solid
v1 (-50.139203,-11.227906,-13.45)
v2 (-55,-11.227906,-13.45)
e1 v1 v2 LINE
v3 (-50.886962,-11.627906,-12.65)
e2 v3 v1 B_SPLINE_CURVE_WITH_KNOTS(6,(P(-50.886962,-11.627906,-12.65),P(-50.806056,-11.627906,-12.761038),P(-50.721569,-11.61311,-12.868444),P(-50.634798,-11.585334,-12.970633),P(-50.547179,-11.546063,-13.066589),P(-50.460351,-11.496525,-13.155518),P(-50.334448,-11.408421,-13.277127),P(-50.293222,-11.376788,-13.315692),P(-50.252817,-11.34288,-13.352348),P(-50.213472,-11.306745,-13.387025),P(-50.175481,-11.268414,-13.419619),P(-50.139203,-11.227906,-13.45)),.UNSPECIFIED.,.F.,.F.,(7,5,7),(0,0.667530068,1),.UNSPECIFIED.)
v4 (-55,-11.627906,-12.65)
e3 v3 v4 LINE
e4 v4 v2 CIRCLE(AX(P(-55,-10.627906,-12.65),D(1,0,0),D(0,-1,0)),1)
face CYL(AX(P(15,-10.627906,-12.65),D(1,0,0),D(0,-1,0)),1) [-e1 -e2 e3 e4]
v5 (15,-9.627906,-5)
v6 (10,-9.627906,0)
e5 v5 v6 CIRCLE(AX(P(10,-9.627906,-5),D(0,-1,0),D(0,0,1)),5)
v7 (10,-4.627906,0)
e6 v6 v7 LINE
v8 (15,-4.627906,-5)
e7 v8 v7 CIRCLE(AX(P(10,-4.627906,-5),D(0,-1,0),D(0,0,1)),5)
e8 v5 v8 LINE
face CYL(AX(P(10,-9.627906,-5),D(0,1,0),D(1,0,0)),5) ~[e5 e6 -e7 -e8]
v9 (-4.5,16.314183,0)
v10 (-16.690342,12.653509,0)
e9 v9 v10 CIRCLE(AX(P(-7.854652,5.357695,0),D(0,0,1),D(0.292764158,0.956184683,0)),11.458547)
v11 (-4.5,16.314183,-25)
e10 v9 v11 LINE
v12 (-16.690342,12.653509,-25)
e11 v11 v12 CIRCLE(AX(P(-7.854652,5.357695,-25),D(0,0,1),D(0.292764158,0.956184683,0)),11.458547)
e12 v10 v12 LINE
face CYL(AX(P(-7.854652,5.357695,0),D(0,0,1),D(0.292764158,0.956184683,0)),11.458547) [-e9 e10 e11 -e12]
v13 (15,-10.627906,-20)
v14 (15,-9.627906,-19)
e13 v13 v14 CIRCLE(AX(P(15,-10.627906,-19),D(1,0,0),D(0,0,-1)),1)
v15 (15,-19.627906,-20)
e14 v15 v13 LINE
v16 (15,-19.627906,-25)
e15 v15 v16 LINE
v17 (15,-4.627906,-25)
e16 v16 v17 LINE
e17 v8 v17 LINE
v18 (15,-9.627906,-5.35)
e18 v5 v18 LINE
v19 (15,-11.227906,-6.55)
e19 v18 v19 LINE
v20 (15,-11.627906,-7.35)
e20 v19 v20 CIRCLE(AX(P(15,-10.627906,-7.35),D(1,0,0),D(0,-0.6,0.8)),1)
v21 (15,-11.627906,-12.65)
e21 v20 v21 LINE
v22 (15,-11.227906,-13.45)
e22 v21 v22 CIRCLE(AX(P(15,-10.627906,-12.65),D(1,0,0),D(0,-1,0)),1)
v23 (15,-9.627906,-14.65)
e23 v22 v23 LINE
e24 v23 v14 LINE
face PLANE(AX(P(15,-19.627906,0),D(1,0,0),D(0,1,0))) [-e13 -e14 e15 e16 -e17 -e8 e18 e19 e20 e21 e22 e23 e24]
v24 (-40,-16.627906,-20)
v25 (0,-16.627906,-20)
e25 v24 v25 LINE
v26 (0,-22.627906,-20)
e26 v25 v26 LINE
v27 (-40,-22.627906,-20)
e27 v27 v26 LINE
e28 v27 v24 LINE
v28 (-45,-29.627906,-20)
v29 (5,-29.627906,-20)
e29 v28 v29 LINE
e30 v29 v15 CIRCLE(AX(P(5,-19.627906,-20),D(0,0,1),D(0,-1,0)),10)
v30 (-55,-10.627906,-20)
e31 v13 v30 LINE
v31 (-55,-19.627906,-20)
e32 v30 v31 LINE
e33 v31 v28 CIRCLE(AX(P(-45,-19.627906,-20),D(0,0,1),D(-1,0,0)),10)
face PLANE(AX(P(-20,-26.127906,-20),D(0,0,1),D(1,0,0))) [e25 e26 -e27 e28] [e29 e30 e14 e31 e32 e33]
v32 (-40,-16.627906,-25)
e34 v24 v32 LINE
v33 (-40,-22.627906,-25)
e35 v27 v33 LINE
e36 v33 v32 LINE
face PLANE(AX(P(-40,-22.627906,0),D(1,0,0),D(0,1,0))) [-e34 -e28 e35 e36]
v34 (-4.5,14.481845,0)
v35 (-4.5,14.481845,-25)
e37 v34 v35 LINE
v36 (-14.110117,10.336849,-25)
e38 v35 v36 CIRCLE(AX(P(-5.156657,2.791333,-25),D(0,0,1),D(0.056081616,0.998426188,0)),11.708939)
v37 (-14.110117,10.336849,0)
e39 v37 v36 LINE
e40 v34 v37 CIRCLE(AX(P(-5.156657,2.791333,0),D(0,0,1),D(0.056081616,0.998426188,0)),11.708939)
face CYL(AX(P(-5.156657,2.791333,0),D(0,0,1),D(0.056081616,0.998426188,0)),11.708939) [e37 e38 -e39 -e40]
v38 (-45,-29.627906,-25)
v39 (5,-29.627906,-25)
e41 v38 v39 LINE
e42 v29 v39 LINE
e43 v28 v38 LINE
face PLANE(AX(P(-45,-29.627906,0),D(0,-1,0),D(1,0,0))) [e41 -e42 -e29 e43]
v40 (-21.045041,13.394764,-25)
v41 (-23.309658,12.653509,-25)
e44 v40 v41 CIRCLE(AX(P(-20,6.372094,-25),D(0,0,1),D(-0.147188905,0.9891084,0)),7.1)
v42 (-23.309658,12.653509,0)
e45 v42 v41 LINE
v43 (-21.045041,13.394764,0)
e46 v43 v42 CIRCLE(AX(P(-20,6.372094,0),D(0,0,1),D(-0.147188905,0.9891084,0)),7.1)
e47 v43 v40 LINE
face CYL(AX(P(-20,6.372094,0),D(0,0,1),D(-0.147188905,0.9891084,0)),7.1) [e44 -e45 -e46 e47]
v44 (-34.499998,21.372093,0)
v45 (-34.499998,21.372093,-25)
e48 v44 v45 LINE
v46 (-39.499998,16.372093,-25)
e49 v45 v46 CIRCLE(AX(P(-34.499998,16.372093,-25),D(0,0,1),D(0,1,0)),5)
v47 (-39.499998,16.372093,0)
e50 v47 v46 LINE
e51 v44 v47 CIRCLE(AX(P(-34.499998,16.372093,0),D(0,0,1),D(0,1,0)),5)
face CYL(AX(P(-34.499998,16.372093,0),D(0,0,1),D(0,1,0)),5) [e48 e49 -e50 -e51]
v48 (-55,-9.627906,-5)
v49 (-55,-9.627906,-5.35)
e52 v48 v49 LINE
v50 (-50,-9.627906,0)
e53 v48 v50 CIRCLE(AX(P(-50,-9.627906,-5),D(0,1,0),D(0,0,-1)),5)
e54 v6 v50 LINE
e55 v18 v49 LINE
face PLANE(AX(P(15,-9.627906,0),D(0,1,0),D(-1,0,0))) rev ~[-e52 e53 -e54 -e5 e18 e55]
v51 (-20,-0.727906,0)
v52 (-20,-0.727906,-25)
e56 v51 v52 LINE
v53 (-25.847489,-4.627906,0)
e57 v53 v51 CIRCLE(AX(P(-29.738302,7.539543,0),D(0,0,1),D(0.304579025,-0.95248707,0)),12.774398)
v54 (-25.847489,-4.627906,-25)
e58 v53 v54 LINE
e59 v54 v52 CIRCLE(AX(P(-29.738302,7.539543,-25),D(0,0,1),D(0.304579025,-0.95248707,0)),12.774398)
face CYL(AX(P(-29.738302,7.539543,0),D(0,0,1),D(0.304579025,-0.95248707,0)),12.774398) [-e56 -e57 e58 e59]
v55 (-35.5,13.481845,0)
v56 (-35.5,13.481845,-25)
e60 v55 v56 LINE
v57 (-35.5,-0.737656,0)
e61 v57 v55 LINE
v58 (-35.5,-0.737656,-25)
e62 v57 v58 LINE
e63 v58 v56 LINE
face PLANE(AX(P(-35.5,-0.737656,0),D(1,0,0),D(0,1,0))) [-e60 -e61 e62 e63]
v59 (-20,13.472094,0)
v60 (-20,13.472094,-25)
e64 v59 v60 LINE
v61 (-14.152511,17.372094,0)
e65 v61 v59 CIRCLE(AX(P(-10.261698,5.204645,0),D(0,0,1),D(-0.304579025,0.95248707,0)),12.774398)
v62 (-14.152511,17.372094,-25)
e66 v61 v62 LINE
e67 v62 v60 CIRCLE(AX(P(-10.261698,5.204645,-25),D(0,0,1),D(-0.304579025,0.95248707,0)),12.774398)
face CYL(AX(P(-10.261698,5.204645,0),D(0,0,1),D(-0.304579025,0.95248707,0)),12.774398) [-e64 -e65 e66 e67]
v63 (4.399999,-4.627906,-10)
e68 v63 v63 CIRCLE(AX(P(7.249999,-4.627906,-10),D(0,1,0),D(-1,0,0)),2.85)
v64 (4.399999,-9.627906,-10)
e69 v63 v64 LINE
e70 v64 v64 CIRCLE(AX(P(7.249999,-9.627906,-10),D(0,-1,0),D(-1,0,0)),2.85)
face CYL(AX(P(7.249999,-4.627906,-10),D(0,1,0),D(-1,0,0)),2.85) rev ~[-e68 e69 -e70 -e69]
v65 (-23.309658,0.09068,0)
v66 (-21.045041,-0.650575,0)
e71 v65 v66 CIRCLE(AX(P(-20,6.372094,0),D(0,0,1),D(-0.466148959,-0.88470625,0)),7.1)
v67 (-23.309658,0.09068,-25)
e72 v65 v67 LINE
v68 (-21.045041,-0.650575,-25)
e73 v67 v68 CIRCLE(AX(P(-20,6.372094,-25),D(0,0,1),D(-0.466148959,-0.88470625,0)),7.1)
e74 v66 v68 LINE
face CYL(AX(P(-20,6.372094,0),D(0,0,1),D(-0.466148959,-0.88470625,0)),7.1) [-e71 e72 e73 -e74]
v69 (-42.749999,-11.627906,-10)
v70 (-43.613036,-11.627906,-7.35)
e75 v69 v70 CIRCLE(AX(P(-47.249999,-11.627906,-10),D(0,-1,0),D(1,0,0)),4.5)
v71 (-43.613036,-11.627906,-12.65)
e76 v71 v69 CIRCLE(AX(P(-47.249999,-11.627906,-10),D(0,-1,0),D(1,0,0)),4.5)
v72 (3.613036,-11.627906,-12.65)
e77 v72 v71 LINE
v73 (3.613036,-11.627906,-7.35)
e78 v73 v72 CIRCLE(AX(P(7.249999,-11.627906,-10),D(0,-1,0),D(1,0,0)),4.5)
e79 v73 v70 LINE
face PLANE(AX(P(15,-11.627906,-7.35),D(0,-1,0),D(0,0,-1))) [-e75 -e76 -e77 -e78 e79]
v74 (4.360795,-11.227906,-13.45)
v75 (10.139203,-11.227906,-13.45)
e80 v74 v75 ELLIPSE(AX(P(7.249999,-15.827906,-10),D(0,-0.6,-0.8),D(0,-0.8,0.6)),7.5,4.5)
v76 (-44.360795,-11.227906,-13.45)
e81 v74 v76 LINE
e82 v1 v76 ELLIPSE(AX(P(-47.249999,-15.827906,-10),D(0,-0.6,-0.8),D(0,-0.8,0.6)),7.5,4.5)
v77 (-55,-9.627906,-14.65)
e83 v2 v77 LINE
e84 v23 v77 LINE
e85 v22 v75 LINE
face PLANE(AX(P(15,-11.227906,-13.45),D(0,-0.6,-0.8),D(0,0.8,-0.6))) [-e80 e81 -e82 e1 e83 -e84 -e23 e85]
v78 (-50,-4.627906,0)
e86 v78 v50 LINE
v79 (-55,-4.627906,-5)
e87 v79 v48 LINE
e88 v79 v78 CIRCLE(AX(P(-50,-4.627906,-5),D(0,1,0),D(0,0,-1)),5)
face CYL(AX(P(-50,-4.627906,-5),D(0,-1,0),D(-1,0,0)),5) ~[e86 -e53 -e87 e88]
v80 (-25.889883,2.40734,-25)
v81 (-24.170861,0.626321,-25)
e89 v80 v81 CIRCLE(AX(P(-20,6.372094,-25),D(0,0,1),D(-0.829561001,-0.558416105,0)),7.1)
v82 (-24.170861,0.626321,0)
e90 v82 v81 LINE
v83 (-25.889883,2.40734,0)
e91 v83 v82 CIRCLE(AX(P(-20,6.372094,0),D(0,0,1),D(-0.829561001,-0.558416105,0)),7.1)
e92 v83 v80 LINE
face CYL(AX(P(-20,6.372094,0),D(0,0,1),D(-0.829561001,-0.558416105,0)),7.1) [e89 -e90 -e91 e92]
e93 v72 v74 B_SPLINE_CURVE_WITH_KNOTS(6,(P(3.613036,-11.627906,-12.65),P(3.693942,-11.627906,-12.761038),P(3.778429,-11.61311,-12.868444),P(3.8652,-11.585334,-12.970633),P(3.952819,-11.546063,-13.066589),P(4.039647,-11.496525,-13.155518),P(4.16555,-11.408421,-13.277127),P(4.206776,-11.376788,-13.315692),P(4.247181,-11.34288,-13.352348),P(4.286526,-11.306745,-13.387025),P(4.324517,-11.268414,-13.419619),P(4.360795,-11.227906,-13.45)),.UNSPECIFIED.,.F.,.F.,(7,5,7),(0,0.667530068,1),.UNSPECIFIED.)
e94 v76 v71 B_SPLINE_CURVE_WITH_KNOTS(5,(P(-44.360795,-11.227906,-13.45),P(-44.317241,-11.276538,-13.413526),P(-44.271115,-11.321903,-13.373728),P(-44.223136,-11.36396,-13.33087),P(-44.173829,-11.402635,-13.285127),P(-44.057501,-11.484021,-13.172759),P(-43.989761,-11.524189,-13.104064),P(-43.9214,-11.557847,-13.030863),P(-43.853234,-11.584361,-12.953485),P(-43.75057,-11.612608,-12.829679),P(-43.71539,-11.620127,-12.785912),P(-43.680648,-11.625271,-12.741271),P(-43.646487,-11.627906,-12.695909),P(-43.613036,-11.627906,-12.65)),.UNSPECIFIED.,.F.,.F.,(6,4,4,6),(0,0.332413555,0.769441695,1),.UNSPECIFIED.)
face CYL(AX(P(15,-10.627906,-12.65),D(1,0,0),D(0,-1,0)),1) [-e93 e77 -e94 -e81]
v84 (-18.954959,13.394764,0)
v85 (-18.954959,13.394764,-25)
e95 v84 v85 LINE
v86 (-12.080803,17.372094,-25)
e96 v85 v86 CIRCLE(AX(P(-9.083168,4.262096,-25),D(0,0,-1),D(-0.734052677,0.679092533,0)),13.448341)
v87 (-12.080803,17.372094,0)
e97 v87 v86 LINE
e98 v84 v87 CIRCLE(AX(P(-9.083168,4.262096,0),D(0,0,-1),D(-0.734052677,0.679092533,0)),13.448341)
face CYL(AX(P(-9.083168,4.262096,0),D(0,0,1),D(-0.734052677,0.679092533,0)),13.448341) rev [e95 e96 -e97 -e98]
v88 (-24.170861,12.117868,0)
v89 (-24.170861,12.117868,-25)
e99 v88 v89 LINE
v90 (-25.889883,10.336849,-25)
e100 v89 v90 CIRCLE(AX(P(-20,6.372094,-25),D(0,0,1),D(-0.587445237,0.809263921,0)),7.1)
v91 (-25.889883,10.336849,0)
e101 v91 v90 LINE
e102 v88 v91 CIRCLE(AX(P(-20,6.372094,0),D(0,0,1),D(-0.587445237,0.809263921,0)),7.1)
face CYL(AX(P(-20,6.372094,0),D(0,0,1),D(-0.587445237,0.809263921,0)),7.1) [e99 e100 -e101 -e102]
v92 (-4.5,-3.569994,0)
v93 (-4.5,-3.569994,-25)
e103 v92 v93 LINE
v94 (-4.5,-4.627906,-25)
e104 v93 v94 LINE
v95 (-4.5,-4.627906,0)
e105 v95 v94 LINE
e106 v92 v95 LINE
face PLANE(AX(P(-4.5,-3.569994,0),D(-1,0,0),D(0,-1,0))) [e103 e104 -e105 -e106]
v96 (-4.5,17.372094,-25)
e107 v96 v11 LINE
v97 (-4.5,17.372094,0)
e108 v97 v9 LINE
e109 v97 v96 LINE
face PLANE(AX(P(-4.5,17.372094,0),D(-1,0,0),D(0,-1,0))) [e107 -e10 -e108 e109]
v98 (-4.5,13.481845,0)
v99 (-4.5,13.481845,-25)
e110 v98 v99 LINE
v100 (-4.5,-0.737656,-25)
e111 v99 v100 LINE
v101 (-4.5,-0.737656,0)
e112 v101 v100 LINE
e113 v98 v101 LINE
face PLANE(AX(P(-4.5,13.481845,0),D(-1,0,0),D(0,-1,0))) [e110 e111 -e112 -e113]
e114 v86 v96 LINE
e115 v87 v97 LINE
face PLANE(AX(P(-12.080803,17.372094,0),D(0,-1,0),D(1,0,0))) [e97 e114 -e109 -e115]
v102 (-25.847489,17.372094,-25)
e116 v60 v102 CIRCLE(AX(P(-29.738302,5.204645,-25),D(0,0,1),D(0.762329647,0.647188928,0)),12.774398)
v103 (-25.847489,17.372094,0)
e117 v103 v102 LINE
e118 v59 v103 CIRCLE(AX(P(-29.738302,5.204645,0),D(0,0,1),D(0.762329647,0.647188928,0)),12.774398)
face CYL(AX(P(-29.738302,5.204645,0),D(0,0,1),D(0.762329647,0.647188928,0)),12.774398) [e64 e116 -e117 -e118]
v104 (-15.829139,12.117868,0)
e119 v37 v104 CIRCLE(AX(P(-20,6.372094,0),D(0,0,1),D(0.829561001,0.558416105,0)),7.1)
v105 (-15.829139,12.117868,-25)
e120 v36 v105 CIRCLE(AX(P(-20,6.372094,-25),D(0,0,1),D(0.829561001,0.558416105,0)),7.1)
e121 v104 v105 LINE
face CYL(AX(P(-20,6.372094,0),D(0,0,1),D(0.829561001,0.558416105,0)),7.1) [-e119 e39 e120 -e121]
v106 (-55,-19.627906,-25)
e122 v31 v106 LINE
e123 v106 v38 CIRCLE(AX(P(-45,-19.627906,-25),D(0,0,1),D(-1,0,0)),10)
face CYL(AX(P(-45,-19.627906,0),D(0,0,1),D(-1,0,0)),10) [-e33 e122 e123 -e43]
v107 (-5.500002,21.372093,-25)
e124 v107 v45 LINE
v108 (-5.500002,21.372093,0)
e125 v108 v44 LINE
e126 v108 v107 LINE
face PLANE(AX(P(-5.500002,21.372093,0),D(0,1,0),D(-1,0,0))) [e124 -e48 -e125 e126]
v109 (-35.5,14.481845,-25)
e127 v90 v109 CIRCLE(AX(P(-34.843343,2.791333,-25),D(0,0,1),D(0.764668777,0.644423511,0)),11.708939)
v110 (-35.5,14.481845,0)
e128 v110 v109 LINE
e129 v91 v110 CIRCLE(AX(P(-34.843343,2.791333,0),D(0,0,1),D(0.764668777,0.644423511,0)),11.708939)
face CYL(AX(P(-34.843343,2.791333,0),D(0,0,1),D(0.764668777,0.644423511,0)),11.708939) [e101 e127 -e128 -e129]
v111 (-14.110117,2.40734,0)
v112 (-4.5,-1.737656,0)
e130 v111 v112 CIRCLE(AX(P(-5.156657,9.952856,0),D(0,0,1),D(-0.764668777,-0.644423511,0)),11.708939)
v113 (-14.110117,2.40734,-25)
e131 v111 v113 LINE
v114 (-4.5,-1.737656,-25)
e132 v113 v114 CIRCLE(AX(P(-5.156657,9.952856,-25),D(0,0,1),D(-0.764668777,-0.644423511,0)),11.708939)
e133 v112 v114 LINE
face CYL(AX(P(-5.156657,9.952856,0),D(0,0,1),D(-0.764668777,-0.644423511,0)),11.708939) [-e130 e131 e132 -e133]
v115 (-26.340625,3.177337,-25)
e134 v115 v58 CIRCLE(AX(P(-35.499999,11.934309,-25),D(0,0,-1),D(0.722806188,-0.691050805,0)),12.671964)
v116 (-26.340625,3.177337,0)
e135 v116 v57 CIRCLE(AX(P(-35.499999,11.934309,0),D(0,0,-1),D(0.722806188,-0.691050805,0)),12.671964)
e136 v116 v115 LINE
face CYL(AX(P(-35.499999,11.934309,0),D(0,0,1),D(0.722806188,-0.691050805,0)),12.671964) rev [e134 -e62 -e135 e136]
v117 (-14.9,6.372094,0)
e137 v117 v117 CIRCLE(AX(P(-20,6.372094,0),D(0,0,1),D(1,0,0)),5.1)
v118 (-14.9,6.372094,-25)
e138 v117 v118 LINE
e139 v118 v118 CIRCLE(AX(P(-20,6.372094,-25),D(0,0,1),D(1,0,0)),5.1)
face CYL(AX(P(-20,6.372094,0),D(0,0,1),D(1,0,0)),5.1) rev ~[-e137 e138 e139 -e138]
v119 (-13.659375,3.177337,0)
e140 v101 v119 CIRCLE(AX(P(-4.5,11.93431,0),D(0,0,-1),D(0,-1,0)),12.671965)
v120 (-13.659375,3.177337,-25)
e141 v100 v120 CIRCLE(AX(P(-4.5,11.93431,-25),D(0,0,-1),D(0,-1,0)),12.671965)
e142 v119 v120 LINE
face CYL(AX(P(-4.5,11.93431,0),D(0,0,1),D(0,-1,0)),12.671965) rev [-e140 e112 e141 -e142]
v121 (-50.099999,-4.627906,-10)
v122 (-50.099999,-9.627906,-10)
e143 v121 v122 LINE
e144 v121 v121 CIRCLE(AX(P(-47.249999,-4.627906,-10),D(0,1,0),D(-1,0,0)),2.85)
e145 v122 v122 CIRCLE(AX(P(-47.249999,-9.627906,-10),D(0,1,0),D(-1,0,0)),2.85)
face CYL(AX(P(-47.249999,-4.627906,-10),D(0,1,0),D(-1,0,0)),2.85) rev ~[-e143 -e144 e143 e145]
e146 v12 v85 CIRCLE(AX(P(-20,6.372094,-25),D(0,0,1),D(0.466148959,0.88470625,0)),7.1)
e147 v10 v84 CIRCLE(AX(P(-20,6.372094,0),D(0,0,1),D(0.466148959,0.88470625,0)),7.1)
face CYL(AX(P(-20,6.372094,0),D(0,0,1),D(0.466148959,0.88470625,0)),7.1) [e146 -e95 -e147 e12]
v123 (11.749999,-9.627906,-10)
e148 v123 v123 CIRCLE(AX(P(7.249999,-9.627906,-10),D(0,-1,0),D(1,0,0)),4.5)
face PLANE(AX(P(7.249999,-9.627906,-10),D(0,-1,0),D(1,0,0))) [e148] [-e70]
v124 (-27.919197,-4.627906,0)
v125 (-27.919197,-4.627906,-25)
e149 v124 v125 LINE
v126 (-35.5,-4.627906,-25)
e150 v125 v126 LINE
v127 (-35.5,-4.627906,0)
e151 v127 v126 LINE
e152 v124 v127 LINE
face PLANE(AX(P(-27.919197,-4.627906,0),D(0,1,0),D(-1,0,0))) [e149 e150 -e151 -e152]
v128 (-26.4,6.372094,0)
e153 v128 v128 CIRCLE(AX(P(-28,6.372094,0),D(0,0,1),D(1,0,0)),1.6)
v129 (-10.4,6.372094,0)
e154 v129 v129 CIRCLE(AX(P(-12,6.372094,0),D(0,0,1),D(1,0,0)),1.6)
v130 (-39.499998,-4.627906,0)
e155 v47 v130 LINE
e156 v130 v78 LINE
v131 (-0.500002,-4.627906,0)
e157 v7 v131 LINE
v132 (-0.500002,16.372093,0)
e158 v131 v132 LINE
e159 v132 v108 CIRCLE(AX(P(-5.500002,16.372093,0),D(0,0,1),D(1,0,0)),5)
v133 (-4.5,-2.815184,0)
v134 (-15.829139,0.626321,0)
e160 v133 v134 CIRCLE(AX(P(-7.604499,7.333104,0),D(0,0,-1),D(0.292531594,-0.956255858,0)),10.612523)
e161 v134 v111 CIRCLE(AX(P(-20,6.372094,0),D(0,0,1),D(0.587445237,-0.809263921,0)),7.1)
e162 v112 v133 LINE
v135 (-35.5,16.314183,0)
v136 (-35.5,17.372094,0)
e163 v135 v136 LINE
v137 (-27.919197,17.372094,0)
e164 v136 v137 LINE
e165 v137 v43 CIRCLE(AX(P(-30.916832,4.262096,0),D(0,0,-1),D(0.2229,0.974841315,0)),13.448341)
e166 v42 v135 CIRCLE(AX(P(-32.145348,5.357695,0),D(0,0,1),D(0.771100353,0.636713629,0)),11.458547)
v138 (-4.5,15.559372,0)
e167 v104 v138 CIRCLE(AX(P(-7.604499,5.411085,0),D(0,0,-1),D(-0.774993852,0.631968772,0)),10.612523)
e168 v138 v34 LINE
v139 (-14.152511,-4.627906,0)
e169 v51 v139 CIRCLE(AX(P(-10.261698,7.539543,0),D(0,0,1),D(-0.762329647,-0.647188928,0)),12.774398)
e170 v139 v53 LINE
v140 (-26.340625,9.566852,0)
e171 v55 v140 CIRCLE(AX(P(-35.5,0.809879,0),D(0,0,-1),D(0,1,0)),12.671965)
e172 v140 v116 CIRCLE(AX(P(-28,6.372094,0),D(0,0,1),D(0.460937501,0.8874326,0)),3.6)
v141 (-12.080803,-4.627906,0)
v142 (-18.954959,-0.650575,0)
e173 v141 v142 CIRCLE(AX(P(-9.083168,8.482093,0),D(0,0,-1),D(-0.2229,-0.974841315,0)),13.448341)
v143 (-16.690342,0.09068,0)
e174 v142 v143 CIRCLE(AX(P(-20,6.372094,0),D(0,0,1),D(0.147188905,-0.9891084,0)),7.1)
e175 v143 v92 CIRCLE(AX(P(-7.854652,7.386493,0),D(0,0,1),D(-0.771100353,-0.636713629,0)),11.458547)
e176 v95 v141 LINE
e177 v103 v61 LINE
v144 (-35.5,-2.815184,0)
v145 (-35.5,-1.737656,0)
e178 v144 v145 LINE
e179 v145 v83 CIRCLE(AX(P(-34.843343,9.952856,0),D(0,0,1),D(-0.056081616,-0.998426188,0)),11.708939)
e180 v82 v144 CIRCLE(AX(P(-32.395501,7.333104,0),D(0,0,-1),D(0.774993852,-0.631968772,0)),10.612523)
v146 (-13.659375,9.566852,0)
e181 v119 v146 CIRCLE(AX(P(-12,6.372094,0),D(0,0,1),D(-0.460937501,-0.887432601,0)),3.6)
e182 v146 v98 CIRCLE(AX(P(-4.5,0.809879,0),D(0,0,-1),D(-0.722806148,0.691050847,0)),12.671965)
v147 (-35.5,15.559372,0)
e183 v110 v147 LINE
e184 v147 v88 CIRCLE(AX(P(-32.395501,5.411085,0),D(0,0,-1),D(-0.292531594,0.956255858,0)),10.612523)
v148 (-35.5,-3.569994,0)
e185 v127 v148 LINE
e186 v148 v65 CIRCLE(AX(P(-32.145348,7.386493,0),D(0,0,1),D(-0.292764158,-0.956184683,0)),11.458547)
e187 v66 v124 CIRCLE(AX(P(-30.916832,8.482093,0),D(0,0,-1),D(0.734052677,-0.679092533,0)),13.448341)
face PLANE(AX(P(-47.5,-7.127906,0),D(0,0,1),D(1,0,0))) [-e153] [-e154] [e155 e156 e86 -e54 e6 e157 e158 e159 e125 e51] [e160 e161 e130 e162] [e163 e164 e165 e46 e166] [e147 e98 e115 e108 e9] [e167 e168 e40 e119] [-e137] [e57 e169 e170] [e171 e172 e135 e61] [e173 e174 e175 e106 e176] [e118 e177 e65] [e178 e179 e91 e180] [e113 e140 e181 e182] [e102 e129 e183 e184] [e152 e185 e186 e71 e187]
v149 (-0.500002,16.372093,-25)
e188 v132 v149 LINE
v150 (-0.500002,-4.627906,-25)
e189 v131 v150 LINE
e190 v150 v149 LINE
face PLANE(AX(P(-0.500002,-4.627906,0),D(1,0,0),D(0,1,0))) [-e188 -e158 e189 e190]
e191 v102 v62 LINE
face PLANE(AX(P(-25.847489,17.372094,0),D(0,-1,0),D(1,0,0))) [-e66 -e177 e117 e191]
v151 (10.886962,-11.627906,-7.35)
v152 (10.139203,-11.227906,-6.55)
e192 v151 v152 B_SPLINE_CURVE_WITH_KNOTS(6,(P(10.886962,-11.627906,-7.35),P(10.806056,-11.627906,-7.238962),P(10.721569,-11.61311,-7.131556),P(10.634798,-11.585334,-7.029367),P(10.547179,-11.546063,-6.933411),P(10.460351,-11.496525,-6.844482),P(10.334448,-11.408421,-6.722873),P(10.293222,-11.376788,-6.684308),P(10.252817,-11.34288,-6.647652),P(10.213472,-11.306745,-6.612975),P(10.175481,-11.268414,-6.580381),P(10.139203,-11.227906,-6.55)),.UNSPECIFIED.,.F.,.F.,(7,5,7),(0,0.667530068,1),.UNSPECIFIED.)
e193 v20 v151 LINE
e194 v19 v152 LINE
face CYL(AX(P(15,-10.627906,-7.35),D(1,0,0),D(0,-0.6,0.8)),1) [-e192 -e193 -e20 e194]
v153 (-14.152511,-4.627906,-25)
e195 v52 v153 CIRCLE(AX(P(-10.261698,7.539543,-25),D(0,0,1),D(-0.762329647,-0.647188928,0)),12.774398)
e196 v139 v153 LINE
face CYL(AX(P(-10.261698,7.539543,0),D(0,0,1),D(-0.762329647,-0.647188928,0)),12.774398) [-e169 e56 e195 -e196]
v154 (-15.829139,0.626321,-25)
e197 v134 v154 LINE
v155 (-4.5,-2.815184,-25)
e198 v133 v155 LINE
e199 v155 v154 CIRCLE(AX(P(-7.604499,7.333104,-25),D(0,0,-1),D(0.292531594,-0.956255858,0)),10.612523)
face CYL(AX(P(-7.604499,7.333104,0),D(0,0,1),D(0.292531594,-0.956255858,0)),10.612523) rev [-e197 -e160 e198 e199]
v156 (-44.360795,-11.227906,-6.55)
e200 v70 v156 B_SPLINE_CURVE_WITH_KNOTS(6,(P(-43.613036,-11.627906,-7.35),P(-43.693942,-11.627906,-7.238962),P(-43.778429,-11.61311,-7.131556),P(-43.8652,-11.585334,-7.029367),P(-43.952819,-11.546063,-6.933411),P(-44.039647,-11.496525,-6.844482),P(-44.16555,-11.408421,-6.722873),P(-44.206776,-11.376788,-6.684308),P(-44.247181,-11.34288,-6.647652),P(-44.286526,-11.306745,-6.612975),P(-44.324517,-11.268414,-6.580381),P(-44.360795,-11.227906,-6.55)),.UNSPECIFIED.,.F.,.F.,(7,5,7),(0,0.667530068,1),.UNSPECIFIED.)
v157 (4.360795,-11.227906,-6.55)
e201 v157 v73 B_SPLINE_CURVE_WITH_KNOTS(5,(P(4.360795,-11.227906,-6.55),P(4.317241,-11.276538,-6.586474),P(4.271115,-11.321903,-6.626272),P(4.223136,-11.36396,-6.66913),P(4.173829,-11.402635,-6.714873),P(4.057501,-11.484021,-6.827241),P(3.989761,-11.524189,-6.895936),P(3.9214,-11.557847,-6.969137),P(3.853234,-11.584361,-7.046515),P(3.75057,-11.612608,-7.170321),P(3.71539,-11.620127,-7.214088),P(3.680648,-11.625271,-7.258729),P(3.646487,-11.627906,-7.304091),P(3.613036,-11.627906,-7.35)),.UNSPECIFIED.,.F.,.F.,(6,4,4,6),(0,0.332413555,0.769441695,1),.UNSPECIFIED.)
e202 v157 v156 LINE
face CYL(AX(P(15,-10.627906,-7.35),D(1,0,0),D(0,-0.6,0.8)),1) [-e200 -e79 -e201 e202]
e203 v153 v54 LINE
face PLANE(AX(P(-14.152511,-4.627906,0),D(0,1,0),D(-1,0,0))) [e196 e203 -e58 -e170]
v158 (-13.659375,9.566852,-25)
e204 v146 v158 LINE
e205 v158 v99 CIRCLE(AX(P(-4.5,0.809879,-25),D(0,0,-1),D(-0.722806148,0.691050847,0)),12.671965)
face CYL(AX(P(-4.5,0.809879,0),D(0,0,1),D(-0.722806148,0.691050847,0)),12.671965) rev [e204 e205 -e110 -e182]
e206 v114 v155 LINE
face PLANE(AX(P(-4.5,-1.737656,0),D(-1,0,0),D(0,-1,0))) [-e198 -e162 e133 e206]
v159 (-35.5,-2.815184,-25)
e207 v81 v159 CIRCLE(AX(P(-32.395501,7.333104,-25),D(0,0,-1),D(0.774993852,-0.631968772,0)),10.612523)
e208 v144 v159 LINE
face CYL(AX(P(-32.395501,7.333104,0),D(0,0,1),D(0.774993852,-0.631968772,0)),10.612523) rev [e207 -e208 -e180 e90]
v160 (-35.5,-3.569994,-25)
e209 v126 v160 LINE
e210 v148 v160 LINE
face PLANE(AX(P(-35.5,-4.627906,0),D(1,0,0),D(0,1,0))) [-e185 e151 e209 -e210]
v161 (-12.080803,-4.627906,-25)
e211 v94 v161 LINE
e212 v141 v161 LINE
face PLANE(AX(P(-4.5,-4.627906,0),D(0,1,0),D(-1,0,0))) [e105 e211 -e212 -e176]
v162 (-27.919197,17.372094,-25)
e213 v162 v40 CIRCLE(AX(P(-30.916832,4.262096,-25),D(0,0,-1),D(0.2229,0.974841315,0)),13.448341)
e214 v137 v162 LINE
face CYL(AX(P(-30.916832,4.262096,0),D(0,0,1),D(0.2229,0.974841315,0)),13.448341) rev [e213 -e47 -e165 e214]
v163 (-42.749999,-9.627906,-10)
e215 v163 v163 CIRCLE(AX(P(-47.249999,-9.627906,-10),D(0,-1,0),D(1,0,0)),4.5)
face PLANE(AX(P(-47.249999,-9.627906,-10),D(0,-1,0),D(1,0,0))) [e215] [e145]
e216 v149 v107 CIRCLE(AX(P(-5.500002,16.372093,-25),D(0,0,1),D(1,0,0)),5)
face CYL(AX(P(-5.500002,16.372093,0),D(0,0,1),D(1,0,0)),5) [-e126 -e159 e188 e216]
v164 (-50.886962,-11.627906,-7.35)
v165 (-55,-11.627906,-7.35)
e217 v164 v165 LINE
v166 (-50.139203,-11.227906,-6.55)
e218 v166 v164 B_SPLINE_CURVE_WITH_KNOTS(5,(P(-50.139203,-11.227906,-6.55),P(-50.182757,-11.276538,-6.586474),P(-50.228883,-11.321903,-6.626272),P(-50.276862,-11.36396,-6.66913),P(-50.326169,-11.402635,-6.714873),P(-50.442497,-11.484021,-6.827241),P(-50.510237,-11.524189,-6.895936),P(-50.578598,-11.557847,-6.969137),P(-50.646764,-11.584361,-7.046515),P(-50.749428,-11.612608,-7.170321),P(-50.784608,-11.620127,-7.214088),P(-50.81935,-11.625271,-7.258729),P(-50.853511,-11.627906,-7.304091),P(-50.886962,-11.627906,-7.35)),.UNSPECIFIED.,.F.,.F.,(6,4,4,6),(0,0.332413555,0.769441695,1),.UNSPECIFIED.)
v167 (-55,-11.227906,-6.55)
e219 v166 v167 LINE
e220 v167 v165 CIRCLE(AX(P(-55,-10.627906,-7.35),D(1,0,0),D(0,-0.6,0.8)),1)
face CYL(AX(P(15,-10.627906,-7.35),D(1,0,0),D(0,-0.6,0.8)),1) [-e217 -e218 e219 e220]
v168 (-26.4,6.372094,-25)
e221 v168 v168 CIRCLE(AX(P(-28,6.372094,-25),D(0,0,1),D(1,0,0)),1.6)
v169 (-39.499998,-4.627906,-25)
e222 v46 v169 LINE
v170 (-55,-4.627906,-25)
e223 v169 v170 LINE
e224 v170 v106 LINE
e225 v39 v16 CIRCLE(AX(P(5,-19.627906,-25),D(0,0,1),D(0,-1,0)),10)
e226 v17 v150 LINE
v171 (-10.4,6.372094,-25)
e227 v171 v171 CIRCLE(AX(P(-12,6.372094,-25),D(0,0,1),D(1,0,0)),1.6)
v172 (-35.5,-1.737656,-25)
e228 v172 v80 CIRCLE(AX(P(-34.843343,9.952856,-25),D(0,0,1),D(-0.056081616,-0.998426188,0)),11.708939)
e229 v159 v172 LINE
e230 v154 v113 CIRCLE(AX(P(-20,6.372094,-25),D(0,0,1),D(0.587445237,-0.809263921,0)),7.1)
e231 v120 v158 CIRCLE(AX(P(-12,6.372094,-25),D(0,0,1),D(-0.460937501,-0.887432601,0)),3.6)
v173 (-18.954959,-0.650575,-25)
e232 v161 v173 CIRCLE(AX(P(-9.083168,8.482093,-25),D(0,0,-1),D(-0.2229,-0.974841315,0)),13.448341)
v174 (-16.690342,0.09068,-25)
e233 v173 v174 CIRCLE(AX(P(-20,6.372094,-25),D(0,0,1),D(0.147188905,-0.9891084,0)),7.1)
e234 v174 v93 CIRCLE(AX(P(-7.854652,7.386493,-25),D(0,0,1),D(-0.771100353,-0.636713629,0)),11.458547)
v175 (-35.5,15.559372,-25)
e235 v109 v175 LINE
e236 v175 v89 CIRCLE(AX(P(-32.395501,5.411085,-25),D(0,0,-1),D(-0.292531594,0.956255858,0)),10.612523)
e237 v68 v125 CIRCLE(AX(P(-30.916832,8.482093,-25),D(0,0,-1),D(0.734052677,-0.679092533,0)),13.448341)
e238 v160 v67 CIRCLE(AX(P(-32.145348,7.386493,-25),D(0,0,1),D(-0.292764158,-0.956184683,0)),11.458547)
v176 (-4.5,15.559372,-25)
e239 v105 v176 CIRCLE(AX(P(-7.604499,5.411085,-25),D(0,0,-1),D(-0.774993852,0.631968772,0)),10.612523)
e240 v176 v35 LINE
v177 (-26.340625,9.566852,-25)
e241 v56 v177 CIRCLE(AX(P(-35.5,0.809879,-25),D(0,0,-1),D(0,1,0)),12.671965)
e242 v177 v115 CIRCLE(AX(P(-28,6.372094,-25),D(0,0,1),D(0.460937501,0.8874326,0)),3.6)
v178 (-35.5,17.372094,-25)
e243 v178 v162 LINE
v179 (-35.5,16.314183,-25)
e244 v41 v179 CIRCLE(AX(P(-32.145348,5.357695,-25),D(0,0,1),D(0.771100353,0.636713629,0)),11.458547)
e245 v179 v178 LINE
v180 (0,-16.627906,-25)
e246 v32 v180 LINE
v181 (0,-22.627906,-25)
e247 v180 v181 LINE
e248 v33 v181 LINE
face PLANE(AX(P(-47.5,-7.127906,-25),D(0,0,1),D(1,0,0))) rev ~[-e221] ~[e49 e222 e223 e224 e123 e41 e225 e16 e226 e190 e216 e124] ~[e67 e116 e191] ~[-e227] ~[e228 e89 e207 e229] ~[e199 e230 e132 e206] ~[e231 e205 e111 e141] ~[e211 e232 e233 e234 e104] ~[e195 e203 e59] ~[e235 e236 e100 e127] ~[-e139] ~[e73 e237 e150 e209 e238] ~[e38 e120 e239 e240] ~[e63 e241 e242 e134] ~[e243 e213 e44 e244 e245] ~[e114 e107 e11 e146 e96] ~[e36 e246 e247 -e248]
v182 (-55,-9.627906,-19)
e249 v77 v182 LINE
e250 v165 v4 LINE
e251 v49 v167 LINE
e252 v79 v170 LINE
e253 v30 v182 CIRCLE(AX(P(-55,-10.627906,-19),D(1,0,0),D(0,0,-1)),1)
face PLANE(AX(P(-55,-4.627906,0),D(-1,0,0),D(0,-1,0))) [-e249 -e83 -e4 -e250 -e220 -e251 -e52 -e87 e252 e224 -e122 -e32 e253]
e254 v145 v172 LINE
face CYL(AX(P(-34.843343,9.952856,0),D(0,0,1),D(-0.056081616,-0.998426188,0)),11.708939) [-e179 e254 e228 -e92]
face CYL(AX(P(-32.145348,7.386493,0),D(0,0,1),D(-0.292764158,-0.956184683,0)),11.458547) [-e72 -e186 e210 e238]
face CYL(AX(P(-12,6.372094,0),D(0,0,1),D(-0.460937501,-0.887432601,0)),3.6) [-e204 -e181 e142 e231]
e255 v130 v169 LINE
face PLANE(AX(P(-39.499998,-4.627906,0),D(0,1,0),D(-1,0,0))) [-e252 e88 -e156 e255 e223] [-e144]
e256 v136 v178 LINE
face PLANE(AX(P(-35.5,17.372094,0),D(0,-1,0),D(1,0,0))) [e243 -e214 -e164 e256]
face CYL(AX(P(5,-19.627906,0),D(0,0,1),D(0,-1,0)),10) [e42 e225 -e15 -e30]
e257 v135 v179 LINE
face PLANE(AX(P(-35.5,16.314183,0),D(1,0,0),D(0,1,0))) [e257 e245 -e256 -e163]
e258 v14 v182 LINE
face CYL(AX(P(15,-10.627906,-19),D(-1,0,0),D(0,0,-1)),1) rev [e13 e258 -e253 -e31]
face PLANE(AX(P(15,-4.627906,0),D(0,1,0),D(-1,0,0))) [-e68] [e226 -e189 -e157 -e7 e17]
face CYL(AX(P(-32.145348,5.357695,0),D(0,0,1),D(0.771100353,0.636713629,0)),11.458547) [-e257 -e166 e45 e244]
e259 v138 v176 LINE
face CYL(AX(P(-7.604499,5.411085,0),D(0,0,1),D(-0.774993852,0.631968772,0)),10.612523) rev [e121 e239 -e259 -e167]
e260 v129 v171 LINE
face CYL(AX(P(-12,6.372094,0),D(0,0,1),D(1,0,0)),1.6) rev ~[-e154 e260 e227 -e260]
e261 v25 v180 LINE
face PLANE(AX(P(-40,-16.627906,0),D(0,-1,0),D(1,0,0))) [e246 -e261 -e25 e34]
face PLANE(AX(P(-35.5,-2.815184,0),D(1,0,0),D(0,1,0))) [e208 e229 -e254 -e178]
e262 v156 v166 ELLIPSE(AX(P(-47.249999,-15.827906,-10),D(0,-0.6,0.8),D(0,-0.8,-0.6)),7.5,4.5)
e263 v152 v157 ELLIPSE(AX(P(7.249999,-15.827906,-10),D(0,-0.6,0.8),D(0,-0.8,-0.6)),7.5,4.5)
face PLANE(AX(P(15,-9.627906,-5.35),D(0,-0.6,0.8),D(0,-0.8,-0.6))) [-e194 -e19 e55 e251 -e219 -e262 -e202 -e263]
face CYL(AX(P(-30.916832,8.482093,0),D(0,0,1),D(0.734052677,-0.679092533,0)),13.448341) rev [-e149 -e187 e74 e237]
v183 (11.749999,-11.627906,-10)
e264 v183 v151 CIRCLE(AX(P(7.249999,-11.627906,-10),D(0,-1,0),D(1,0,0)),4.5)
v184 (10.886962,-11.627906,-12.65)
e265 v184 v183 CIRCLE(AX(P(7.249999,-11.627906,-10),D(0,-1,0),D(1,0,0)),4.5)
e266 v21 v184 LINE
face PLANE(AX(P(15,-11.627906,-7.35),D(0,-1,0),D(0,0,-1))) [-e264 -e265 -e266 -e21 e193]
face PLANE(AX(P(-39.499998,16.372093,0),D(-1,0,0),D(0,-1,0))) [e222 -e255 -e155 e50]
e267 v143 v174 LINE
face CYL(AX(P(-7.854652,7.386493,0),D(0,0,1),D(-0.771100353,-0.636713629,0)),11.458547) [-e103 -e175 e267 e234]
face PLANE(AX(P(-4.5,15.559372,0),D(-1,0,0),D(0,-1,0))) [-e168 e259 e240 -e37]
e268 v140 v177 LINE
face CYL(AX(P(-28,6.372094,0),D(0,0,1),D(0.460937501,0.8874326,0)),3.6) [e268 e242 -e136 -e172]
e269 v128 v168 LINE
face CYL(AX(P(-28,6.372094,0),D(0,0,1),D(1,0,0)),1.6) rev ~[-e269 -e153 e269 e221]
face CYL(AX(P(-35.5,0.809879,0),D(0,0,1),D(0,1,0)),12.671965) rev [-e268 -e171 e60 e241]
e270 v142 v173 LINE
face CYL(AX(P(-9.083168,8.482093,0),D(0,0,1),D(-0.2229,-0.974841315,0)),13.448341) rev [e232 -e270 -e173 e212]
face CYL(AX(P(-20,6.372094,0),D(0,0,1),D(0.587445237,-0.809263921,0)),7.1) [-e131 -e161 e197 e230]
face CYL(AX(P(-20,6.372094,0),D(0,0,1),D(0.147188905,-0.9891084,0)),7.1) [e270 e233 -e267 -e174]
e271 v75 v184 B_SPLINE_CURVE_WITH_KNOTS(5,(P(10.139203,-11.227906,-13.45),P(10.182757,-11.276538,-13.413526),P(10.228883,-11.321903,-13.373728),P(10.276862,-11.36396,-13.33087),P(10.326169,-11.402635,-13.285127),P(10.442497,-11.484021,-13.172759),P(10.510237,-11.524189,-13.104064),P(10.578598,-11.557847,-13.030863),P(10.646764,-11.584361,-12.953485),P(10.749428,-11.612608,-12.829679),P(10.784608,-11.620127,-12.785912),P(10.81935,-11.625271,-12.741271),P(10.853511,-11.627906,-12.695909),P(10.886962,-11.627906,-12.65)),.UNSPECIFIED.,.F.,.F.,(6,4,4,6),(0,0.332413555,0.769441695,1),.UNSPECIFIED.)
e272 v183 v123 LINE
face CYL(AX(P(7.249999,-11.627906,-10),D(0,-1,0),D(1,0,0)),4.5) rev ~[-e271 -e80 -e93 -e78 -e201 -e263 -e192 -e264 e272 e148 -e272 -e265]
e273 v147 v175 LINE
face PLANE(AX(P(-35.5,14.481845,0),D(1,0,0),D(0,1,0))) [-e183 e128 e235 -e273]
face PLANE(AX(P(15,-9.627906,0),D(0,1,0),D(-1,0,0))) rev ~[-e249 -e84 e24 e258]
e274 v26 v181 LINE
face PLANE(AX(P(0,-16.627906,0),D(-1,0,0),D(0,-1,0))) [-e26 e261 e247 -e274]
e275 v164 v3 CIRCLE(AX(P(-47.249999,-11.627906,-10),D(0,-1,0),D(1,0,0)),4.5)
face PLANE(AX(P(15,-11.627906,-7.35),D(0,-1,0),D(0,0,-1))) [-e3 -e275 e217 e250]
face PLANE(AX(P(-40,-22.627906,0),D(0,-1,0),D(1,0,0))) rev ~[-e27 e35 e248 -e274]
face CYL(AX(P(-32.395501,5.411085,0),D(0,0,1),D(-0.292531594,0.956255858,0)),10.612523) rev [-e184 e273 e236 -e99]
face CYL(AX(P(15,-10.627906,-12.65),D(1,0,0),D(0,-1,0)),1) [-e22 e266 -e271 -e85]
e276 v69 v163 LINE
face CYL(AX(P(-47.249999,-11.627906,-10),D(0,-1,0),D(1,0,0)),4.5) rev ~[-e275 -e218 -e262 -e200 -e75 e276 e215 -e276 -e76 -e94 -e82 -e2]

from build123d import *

# Parameters (mm, degrees)
F0_W     = 15
F0_H     = 5
F0_W_2   = 40
F0_H_2   = 7
F0_R     = 1.6
F0_R_2   = 5.1
F1_DEPTH = 25
F2_DEPTH = 20
F5_DEPTH = 70
F3_R     = 2.85
F6_DEPTH = 25.001
F7_R     = 4.5
F7_R_2   = 2.85
F8_DEPTH = 2
F9_R     = 5
F10_R    = 1


# Not quite as in the source:
# - ends of sketch curves that miss each other by under 0.0002 mm in the source are joined
# - a feature names something its author has since deleted; it is built from what else it names


with BuildPart() as f1:
    # F0 (on Top) → F1 (new body)
    with BuildSketch(Plane.XY):
        with Locations((-47.5, -7.1279055323)):
            Rectangle(F0_W, F0_H)
        with Locations((7.5, -7.1279055323)):
            Rectangle(F0_W, F0_H)
        with Locations((-20, -26.1279055323)):
            Rectangle(F0_W_2, F0_H_2)
        with BuildLine():
            ThreePointArc((-13.6593749135, 9.5668516592), (-9.4804951392, 12.4620627067), (-4.5000003888, 13.481844654))
            Line((-4.5000003888, 13.481844654), (-4.5000003888, 14.481844654))
            ThreePointArc((-4.5000003888, 14.481844654), (-9.793949685, 13.5428339695), (-14.1101168945, 10.3368488111))
            ThreePointArc((-14.1101168945, 10.3368488111), (-13.872638695, 9.9589375697), (-13.6593749135, 9.5668516592))
        make_face()
        with BuildLine():
            ThreePointArc((-15.8291388207, 12.1178683079), (-10.6891300848, 15.5654287884), (-4.5000003888, 15.5593724921))
            Line((-4.5000003888, 15.5593724921), (-4.5000003888, 16.3141830726))
            ThreePointArc((-4.5000003888, 16.3141830726), (-11.1501915503, 16.3321080887), (-16.6903423933, 12.6535088408))
            ThreePointArc((-16.6903423933, 12.6535088408), (-16.2501642673, 12.4010854262), (-15.8291388207, 12.1178683079))
        make_face()
        with BuildLine():
            ThreePointArc((-18.9549587768, 13.3947641055), (-15.8181752362, 15.9024378017), (-12.0808034818, 17.3720944677))
            Line((-12.0808034818, 17.3720944677), (-14.1525114111, 17.3720944677))
            ThreePointArc((-14.1525114111, 17.3720944677), (-17.3497652419, 15.8321825785), (-20.0000000983, 13.4720944677))
            ThreePointArc((-20, 13.4720944677), (-19.4760507794, 13.4527354849), (-18.9549587768, 13.3947641055))
        make_face()
        with BuildLine():
            Line((-25.8474885889, 17.3720944677), (-27.9191965182, 17.3720944677))
            ThreePointArc((-27.9191965182, 17.3720944677), (-24.1818247638, 15.9024378017), (-21.0450412232, 13.3947641055))
            ThreePointArc((-21.0450412232, 13.3947641055), (-20.5239492206, 13.4527354849), (-20, 13.4720944677))
            ThreePointArc((-19.9999999017, 13.4720944677), (-22.6502347581, 15.8321825785), (-25.8474885889, 17.3720944677))
        make_face()
        with BuildLine():
            Line((-35.4999996112, 16.3141830726), (-35.4999996112, 15.5593724921))
            ThreePointArc((-35.4999996112, 15.5593724921), (-29.3108699152, 15.5654287884), (-24.1708611793, 12.1178683079))
            ThreePointArc((-24.1708611793, 12.1178683079), (-23.7498357327, 12.4010854262), (-23.3096576067, 12.6535088408))
            ThreePointArc((-23.3096576067, 12.6535088408), (-28.8498084497, 16.3321080887), (-35.4999996112, 16.3141830726))
        make_face()
        with BuildLine():
            Line((-35.4999996112, 14.481844654), (-35.4999996112, 13.481844654))
            ThreePointArc((-35.4999996112, 13.481844654), (-30.5195048608, 12.4620627067), (-26.3406250865, 9.5668516592))
            ThreePointArc((-26.3406250865, 9.5668516592), (-26.1273613547, 9.9589374848), (-25.8898831055, 10.3368488111))
            ThreePointArc((-25.8898831055, 10.3368488111), (-30.206050315, 13.5428339695), (-35.4999996112, 14.481844654))
        make_face()
        with BuildLine():
            Line((-35.4999996112, -0.7376557186), (-35.4999996112, -1.7376557186))
            ThreePointArc((-35.4999996112, -1.7376557186), (-30.206050315, -0.7986450341), (-25.8898831055, 2.4073401243))
            ThreePointArc((-25.8898831055, 2.4073401243), (-26.1273613547, 2.7852514506), (-26.340625175, 3.1773374518))
            ThreePointArc((-26.340625175, 3.1773374518), (-30.5195048608, 0.2821262287), (-35.4999996112, -0.7376557186))
        make_face()
        with BuildLine():
            Line((-35.4999996112, -2.8151835567), (-35.4999996112, -3.5699941372))
            ThreePointArc((-35.4999996112, -3.5699941372), (-28.8498084497, -3.5879191533), (-23.3096576067, 0.0906800946))
            ThreePointArc((-23.3096576067, 0.0906800946), (-23.7498357327, 0.3431035092), (-24.1708611793, 0.6263206275))
            ThreePointArc((-24.1708611793, 0.6263206275), (-29.3108699152, -2.821239853), (-35.4999996112, -2.8151835567))
        make_face()
        with BuildLine():
            ThreePointArc((-16.6903423933, 0.0906800946), (-11.1501915503, -3.5879191533), (-4.5000003888, -3.5699941372))
            Line((-4.5000003888, -3.5699941372), (-4.5000003888, -2.8151835567))
            ThreePointArc((-4.5000003888, -2.8151835567), (-10.6891300848, -2.821239853), (-15.8291388207, 0.6263206275))
            ThreePointArc((-15.8291388207, 0.6263206275), (-16.2501642673, 0.3431035092), (-16.6903423933, 0.0906800946))
        make_face()
        with BuildLine():
            ThreePointArc((-14.1101168945, 2.4073401243), (-9.793949685, -0.7986450341), (-4.5000003888, -1.7376557186))
            Line((-4.5000003888, -1.7376557186), (-4.5000003888, -0.7376557186))
            ThreePointArc((-4.5000003888, -0.7376557186), (-9.4804951392, 0.2821262287), (-13.6593749135, 3.1773372762))
            ThreePointArc((-13.6593749135, 3.1773372762), (-13.872638695, 2.7852513658), (-14.1101168945, 2.4073401243))
        make_face()
        with BuildLine():
            Line((-45, -29.6279055323), (-40, -29.6279055323))
            Line((-40, -29.6279055323), (-40, -22.6279055323))
            Line((-40, -22.6279055323), (-40, -16.6279055323))
            Line((-40, -16.6279055323), (-40, -9.6279055323))
            Line((-40, -9.6279055323), (-55, -9.6279055323))
            Line((-55, -9.6279055323), (-55, -19.6279055323))
            ThreePointArc((-55, -19.6279055323), (-52.0710678119, -26.6989733442), (-45, -29.6279055323))
        make_face()
        with BuildLine():
            Line((0, -22.6279055323), (0, -29.6279055323))
            Line((0, -29.6279055323), (5, -29.6279055323))
            ThreePointArc((5, -29.6279055323), (12.0710678119, -26.6989733442), (15, -19.6279055323))
            Line((15, -19.6279055323), (15, -9.6279055323))
            Line((15, -9.6279055323), (0, -9.6279055323))
            Line((0, -9.6279055323), (0, -16.6279055323))
            Line((0, -16.6279055323), (0, -22.6279055323))
        make_face()
        Polygon((-40, -4.6279055323), (-40, -9.6279055323), (0, -9.6279055323), (0, -4.6279055323), (-0.5000019073, -4.6279055323), (-4.5000003888, -4.6279055323), (-12.0808034818, -4.6279055323), (-14.1525114111, -4.6279055323), (-25.8474885889, -4.6279055323), (-27.9191965182, -4.6279055323), (-35.4999996112, -4.6279055323), (-39.4999980927, -4.6279055323), align=None)
        with BuildLine():
            ThreePointArc((-23.3096576067, 0.0906800946), (-22.2086682224, -0.3756299401), (-21.0450412232, -0.6505751701))
            ThreePointArc((-21.0450412232, -0.6505751701), (-20.5239492206, -0.7085465495), (-20, -0.7279055323))
            ThreePointArc((-20, -0.7279055323), (-19.4760507794, -0.7085465495), (-18.9549587768, -0.6505751701))
            ThreePointArc((-18.9549587768, -0.6505751701), (-17.7913317776, -0.3756299401), (-16.6903423933, 0.0906800946))
            ThreePointArc((-16.6903423933, 0.0906800946), (-16.2501642673, 0.3431035092), (-15.8291388207, 0.6263206275))
            ThreePointArc((-15.8291388207, 0.6263206275), (-14.8914139429, 1.4413390999), (-14.1101168945, 2.4073401243))
            ThreePointArc((-14.1101168945, 2.4073401243), (-13.872638695, 2.7852513658), (-13.6593749135, 3.1773372762))
            ThreePointArc((-13.6593749135, 3.1773372762), (-8.4000001922, 6.3720944677), (-13.6593749135, 9.5668516592))
            ThreePointArc((-13.6593749135, 9.5668516592), (-13.872638695, 9.9589375697), (-14.1101168945, 10.3368488111))
            ThreePointArc((-14.1101168945, 10.3368488111), (-14.8914139429, 11.3028498355), (-15.8291388207, 12.1178683079))
            ThreePointArc((-15.8291388207, 12.1178683079), (-16.2501642673, 12.4010854262), (-16.6903423933, 12.6535088408))
            ThreePointArc((-16.6903423933, 12.6535088408), (-17.7913317776, 13.1198188755), (-18.9549587768, 13.3947641055))
            ThreePointArc((-18.9549587768, 13.3947641055), (-19.4760507794, 13.4527354849), (-20, 13.4720944677))
            ThreePointArc((-20, 13.4720944677), (-20.5239492206, 13.4527354849), (-21.0450412232, 13.3947641055))
            ThreePointArc((-21.0450412232, 13.3947641055), (-22.2086682224, 13.1198188755), (-23.3096576067, 12.6535088408))
            ThreePointArc((-23.3096576067, 12.6535088408), (-23.7498357327, 12.4010854262), (-24.1708611793, 12.1178683079))
            ThreePointArc((-24.1708611793, 12.1178683079), (-25.1085860571, 11.3028498355), (-25.8898831055, 10.3368488111))
            ThreePointArc((-25.8898831055, 10.3368488111), (-26.1273613547, 9.9589374848), (-26.340625175, 9.5668514836))
            ThreePointArc((-26.340625175, 9.5668514836), (-31.5999996112, 6.3720944677), (-26.340625175, 3.1773374518))
            ThreePointArc((-26.340625175, 3.1773374518), (-26.1273613547, 2.7852514506), (-25.8898831055, 2.4073401243))
            ThreePointArc((-25.8898831055, 2.4073401243), (-25.1085860571, 1.4413390999), (-24.1708611793, 0.6263206275))
            ThreePointArc((-24.1708611793, 0.6263206275), (-23.7498357327, 0.3431035092), (-23.3096576067, 0.0906800946))
        make_face()
        with Locations((-28, 6.3720944677)):
            Circle(F0_R, mode=Mode.SUBTRACT)
        with Locations((-20, 6.3720944677)):
            Circle(F0_R_2, mode=Mode.SUBTRACT)
        with Locations((-12, 6.3720944677)):
            Circle(F0_R, mode=Mode.SUBTRACT)
        with BuildLine():
            Line((-14.1525114111, -4.6279055323), (-12.0808034818, -4.6279055323))
            ThreePointArc((-12.0808034818, -4.6279055323), (-15.8181752362, -3.1582488663), (-18.9549587768, -0.6505751701))
            ThreePointArc((-18.9549587768, -0.6505751701), (-19.4760507794, -0.7085465495), (-20, -0.7279055323))
            ThreePointArc((-20.0000000983, -0.7279055323), (-17.3497652419, -3.0879936431), (-14.1525114111, -4.6279055323))
        make_face()
        with BuildLine():
            ThreePointArc((-21.0450412232, -0.6505751701), (-24.1818247638, -3.1582488663), (-27.9191965182, -4.6279055323))
            Line((-27.9191965182, -4.6279055323), (-25.8474885889, -4.6279055323))
            ThreePointArc((-25.8474885889, -4.6279055323), (-22.6502347581, -3.0879936431), (-19.9999999017, -0.7279055323))
            ThreePointArc((-20, -0.7279055323), (-20.5239492206, -0.7085465495), (-21.0450412232, -0.6505751701))
        make_face()
        with BuildLine():
            Line((-39.4999980927, 16.3720929492), (-39.4999980927, -4.6279055323))
            Line((-39.4999980927, -4.6279055323), (-35.4999996112, -4.6279055323))
            Line((-35.4999996112, -4.6279055323), (-35.4999996112, -3.5699941372))
            Line((-35.4999996112, -3.5699941372), (-35.4999996112, -2.8151835567))
            Line((-35.4999996112, -2.8151835567), (-35.4999996112, -1.7376557186))
            Line((-35.4999996112, -1.7376557186), (-35.4999996112, -0.7376557186))
            Line((-35.4999996112, -0.7376557186), (-35.4999996112, 13.481844654))
            Line((-35.4999996112, 13.481844654), (-35.4999996112, 14.481844654))
            Line((-35.4999996112, 14.481844654), (-35.4999996112, 15.5593724921))
            Line((-35.4999996112, 15.5593724921), (-35.4999996112, 16.3141830726))
            Line((-35.4999996112, 16.3141830726), (-35.4999996112, 17.3720944677))
            Line((-35.4999996112, 17.3720944677), (-27.9191965182, 17.3720944677))
            Line((-27.9191965182, 17.3720944677), (-25.8474885889, 17.3720944677))
            Line((-25.8474885889, 17.3720944677), (-14.1525114111, 17.3720944677))
            Line((-14.1525114111, 17.3720944677), (-12.0808034818, 17.3720944677))
            Line((-12.0808034818, 17.3720944677), (-4.5000003888, 17.3720944677))
            Line((-4.5000003888, 17.3720944677), (-4.5000003888, 16.3141830726))
            Line((-4.5000003888, 16.3141830726), (-4.5000003888, 15.5593724921))
            Line((-4.5000003888, 15.5593724921), (-4.5000003888, 14.481844654))
            Line((-4.5000003888, 14.481844654), (-4.5000003888, 13.481844654))
            Line((-4.5000003888, 13.481844654), (-4.5000003888, -0.7376557186))
            Line((-4.5000003888, -0.7376557186), (-4.5000003888, -1.7376557186))
            Line((-4.5000003888, -1.7376557186), (-4.5000003888, -2.8151835567))
            Line((-4.5000003888, -2.8151835567), (-4.5000003888, -3.5699941372))
            Line((-4.5000003888, -3.5699941372), (-4.5000003888, -4.6279055323))
            Line((-4.5000003888, -4.6279055323), (-0.5000019073, -4.6279055323))
            Line((-0.5000019073, -4.6279055323), (-0.5000019073, 16.3720929492))
            ThreePointArc((-0.5000019073, 16.3720929492), (-1.9644680014, 19.9076268551), (-5.5000019073, 21.3720929492))
            Line((-5.5000019073, 21.3720929492), (-34.4999980927, 21.3720929492))
            ThreePointArc((-34.4999980927, 21.3720929492), (-38.0355319986, 19.9076268551), (-39.4999980927, 16.3720929492))
        make_face()
        with Locations((-20, -13.1279055323)):
            Rectangle(F0_W_2, F0_H_2)
    extrude(amount=-F1_DEPTH)

    # F0 (on Top) → F2 (cut)
    with BuildSketch(Plane.XY):
        with Locations((-20, -26.1279055323)):
            Rectangle(F0_W_2, F0_H_2)
        with BuildLine():
            Line((-45, -29.6279055323), (-40, -29.6279055323))
            Line((-40, -29.6279055323), (-40, -22.6279055323))
            Line((-40, -22.6279055323), (-40, -16.6279055323))
            Line((-40, -16.6279055323), (-40, -9.6279055323))
            Line((-40, -9.6279055323), (-55, -9.6279055323))
            Line((-55, -9.6279055323), (-55, -19.6279055323))
            ThreePointArc((-55, -19.6279055323), (-52.0710678119, -26.6989733442), (-45, -29.6279055323))
        make_face()
        with BuildLine():
            Line((0, -22.6279055323), (0, -29.6279055323))
            Line((0, -29.6279055323), (5, -29.6279055323))
            ThreePointArc((5, -29.6279055323), (12.0710678119, -26.6989733442), (15, -19.6279055323))
            Line((15, -19.6279055323), (15, -9.6279055323))
            Line((15, -9.6279055323), (0, -9.6279055323))
            Line((0, -9.6279055323), (0, -16.6279055323))
            Line((0, -16.6279055323), (0, -22.6279055323))
        make_face()
        with Locations((-20, -13.1279055323)):
            Rectangle(F0_W_2, F0_H_2)
    extrude(amount=-F2_DEPTH, mode=Mode.SUBTRACT)

    # F4 (on face) → F5 (join, through all)
    with BuildSketch(Plane.YZ.offset(15)):
        with BuildLine():
            Line((-11.6279055323, -7.35), (-11.6279055323, -10))
            Line((-11.6279055323, -10), (-11.6279055323, -12.65))
            ThreePointArc((-11.6279055323, -12.65), (-11.5223327233, -13.0972135955), (-11.2279055323, -13.45))
            Line((-11.2279055323, -13.45), (-9.6279055323, -14.65))
            Line((-9.6279055323, -14.65), (-9.6279055323, -10))
            Line((-9.6279055323, -10), (-9.6279055323, -5.35))
            Line((-9.6279055323, -5.35), (-11.2279055323, -6.55))
            ThreePointArc((-11.2279055323, -6.55), (-11.5223327233, -6.9027864045), (-11.6279055323, -7.35))
        make_face()
    extrude(amount=-F5_DEPTH)

    # F3 (on face) → F6 (cut, through all)
    with BuildSketch(Plane(origin=(0, -4.6279055323, 0), x_dir=(-1, 0, 0), z_dir=(0, 1, 0))):
        with Locations((47.2499990463, -10)):
            Circle(F3_R)
        with Locations((-7.2499990463, -10)):
            Circle(F3_R)
    extrude(amount=-F6_DEPTH, mode=Mode.SUBTRACT)

    # F7 (on face) → F8 (cut, through all)
    with BuildSketch(Plane.XZ.offset(11.6279055323)):
        with Locations((7.2499990463, -10)):
            Circle(F7_R)
        with Locations((7.2499990463, -10)):
            Circle(F7_R_2, mode=Mode.SUBTRACT)
        with Locations((-47.2499990463, -10)):
            Circle(F7_R)
    extrude(amount=-F8_DEPTH, mode=Mode.SUBTRACT)

    # F9
    f9_edges = [f1.edges().sort_by_distance(p)[0] for p in [
        (15, -7.127906, 0),
        (-55, -7.127906, 0),
    ]]
    fillet(f9_edges, radius=F9_R)

    # F10
    f10_edges = [f1.edges().sort_by_distance(p)[0] for p in [
        (-20, -9.627906, -20),
    ]]
    fillet(f10_edges, radius=F10_R)


solid = f1.part
